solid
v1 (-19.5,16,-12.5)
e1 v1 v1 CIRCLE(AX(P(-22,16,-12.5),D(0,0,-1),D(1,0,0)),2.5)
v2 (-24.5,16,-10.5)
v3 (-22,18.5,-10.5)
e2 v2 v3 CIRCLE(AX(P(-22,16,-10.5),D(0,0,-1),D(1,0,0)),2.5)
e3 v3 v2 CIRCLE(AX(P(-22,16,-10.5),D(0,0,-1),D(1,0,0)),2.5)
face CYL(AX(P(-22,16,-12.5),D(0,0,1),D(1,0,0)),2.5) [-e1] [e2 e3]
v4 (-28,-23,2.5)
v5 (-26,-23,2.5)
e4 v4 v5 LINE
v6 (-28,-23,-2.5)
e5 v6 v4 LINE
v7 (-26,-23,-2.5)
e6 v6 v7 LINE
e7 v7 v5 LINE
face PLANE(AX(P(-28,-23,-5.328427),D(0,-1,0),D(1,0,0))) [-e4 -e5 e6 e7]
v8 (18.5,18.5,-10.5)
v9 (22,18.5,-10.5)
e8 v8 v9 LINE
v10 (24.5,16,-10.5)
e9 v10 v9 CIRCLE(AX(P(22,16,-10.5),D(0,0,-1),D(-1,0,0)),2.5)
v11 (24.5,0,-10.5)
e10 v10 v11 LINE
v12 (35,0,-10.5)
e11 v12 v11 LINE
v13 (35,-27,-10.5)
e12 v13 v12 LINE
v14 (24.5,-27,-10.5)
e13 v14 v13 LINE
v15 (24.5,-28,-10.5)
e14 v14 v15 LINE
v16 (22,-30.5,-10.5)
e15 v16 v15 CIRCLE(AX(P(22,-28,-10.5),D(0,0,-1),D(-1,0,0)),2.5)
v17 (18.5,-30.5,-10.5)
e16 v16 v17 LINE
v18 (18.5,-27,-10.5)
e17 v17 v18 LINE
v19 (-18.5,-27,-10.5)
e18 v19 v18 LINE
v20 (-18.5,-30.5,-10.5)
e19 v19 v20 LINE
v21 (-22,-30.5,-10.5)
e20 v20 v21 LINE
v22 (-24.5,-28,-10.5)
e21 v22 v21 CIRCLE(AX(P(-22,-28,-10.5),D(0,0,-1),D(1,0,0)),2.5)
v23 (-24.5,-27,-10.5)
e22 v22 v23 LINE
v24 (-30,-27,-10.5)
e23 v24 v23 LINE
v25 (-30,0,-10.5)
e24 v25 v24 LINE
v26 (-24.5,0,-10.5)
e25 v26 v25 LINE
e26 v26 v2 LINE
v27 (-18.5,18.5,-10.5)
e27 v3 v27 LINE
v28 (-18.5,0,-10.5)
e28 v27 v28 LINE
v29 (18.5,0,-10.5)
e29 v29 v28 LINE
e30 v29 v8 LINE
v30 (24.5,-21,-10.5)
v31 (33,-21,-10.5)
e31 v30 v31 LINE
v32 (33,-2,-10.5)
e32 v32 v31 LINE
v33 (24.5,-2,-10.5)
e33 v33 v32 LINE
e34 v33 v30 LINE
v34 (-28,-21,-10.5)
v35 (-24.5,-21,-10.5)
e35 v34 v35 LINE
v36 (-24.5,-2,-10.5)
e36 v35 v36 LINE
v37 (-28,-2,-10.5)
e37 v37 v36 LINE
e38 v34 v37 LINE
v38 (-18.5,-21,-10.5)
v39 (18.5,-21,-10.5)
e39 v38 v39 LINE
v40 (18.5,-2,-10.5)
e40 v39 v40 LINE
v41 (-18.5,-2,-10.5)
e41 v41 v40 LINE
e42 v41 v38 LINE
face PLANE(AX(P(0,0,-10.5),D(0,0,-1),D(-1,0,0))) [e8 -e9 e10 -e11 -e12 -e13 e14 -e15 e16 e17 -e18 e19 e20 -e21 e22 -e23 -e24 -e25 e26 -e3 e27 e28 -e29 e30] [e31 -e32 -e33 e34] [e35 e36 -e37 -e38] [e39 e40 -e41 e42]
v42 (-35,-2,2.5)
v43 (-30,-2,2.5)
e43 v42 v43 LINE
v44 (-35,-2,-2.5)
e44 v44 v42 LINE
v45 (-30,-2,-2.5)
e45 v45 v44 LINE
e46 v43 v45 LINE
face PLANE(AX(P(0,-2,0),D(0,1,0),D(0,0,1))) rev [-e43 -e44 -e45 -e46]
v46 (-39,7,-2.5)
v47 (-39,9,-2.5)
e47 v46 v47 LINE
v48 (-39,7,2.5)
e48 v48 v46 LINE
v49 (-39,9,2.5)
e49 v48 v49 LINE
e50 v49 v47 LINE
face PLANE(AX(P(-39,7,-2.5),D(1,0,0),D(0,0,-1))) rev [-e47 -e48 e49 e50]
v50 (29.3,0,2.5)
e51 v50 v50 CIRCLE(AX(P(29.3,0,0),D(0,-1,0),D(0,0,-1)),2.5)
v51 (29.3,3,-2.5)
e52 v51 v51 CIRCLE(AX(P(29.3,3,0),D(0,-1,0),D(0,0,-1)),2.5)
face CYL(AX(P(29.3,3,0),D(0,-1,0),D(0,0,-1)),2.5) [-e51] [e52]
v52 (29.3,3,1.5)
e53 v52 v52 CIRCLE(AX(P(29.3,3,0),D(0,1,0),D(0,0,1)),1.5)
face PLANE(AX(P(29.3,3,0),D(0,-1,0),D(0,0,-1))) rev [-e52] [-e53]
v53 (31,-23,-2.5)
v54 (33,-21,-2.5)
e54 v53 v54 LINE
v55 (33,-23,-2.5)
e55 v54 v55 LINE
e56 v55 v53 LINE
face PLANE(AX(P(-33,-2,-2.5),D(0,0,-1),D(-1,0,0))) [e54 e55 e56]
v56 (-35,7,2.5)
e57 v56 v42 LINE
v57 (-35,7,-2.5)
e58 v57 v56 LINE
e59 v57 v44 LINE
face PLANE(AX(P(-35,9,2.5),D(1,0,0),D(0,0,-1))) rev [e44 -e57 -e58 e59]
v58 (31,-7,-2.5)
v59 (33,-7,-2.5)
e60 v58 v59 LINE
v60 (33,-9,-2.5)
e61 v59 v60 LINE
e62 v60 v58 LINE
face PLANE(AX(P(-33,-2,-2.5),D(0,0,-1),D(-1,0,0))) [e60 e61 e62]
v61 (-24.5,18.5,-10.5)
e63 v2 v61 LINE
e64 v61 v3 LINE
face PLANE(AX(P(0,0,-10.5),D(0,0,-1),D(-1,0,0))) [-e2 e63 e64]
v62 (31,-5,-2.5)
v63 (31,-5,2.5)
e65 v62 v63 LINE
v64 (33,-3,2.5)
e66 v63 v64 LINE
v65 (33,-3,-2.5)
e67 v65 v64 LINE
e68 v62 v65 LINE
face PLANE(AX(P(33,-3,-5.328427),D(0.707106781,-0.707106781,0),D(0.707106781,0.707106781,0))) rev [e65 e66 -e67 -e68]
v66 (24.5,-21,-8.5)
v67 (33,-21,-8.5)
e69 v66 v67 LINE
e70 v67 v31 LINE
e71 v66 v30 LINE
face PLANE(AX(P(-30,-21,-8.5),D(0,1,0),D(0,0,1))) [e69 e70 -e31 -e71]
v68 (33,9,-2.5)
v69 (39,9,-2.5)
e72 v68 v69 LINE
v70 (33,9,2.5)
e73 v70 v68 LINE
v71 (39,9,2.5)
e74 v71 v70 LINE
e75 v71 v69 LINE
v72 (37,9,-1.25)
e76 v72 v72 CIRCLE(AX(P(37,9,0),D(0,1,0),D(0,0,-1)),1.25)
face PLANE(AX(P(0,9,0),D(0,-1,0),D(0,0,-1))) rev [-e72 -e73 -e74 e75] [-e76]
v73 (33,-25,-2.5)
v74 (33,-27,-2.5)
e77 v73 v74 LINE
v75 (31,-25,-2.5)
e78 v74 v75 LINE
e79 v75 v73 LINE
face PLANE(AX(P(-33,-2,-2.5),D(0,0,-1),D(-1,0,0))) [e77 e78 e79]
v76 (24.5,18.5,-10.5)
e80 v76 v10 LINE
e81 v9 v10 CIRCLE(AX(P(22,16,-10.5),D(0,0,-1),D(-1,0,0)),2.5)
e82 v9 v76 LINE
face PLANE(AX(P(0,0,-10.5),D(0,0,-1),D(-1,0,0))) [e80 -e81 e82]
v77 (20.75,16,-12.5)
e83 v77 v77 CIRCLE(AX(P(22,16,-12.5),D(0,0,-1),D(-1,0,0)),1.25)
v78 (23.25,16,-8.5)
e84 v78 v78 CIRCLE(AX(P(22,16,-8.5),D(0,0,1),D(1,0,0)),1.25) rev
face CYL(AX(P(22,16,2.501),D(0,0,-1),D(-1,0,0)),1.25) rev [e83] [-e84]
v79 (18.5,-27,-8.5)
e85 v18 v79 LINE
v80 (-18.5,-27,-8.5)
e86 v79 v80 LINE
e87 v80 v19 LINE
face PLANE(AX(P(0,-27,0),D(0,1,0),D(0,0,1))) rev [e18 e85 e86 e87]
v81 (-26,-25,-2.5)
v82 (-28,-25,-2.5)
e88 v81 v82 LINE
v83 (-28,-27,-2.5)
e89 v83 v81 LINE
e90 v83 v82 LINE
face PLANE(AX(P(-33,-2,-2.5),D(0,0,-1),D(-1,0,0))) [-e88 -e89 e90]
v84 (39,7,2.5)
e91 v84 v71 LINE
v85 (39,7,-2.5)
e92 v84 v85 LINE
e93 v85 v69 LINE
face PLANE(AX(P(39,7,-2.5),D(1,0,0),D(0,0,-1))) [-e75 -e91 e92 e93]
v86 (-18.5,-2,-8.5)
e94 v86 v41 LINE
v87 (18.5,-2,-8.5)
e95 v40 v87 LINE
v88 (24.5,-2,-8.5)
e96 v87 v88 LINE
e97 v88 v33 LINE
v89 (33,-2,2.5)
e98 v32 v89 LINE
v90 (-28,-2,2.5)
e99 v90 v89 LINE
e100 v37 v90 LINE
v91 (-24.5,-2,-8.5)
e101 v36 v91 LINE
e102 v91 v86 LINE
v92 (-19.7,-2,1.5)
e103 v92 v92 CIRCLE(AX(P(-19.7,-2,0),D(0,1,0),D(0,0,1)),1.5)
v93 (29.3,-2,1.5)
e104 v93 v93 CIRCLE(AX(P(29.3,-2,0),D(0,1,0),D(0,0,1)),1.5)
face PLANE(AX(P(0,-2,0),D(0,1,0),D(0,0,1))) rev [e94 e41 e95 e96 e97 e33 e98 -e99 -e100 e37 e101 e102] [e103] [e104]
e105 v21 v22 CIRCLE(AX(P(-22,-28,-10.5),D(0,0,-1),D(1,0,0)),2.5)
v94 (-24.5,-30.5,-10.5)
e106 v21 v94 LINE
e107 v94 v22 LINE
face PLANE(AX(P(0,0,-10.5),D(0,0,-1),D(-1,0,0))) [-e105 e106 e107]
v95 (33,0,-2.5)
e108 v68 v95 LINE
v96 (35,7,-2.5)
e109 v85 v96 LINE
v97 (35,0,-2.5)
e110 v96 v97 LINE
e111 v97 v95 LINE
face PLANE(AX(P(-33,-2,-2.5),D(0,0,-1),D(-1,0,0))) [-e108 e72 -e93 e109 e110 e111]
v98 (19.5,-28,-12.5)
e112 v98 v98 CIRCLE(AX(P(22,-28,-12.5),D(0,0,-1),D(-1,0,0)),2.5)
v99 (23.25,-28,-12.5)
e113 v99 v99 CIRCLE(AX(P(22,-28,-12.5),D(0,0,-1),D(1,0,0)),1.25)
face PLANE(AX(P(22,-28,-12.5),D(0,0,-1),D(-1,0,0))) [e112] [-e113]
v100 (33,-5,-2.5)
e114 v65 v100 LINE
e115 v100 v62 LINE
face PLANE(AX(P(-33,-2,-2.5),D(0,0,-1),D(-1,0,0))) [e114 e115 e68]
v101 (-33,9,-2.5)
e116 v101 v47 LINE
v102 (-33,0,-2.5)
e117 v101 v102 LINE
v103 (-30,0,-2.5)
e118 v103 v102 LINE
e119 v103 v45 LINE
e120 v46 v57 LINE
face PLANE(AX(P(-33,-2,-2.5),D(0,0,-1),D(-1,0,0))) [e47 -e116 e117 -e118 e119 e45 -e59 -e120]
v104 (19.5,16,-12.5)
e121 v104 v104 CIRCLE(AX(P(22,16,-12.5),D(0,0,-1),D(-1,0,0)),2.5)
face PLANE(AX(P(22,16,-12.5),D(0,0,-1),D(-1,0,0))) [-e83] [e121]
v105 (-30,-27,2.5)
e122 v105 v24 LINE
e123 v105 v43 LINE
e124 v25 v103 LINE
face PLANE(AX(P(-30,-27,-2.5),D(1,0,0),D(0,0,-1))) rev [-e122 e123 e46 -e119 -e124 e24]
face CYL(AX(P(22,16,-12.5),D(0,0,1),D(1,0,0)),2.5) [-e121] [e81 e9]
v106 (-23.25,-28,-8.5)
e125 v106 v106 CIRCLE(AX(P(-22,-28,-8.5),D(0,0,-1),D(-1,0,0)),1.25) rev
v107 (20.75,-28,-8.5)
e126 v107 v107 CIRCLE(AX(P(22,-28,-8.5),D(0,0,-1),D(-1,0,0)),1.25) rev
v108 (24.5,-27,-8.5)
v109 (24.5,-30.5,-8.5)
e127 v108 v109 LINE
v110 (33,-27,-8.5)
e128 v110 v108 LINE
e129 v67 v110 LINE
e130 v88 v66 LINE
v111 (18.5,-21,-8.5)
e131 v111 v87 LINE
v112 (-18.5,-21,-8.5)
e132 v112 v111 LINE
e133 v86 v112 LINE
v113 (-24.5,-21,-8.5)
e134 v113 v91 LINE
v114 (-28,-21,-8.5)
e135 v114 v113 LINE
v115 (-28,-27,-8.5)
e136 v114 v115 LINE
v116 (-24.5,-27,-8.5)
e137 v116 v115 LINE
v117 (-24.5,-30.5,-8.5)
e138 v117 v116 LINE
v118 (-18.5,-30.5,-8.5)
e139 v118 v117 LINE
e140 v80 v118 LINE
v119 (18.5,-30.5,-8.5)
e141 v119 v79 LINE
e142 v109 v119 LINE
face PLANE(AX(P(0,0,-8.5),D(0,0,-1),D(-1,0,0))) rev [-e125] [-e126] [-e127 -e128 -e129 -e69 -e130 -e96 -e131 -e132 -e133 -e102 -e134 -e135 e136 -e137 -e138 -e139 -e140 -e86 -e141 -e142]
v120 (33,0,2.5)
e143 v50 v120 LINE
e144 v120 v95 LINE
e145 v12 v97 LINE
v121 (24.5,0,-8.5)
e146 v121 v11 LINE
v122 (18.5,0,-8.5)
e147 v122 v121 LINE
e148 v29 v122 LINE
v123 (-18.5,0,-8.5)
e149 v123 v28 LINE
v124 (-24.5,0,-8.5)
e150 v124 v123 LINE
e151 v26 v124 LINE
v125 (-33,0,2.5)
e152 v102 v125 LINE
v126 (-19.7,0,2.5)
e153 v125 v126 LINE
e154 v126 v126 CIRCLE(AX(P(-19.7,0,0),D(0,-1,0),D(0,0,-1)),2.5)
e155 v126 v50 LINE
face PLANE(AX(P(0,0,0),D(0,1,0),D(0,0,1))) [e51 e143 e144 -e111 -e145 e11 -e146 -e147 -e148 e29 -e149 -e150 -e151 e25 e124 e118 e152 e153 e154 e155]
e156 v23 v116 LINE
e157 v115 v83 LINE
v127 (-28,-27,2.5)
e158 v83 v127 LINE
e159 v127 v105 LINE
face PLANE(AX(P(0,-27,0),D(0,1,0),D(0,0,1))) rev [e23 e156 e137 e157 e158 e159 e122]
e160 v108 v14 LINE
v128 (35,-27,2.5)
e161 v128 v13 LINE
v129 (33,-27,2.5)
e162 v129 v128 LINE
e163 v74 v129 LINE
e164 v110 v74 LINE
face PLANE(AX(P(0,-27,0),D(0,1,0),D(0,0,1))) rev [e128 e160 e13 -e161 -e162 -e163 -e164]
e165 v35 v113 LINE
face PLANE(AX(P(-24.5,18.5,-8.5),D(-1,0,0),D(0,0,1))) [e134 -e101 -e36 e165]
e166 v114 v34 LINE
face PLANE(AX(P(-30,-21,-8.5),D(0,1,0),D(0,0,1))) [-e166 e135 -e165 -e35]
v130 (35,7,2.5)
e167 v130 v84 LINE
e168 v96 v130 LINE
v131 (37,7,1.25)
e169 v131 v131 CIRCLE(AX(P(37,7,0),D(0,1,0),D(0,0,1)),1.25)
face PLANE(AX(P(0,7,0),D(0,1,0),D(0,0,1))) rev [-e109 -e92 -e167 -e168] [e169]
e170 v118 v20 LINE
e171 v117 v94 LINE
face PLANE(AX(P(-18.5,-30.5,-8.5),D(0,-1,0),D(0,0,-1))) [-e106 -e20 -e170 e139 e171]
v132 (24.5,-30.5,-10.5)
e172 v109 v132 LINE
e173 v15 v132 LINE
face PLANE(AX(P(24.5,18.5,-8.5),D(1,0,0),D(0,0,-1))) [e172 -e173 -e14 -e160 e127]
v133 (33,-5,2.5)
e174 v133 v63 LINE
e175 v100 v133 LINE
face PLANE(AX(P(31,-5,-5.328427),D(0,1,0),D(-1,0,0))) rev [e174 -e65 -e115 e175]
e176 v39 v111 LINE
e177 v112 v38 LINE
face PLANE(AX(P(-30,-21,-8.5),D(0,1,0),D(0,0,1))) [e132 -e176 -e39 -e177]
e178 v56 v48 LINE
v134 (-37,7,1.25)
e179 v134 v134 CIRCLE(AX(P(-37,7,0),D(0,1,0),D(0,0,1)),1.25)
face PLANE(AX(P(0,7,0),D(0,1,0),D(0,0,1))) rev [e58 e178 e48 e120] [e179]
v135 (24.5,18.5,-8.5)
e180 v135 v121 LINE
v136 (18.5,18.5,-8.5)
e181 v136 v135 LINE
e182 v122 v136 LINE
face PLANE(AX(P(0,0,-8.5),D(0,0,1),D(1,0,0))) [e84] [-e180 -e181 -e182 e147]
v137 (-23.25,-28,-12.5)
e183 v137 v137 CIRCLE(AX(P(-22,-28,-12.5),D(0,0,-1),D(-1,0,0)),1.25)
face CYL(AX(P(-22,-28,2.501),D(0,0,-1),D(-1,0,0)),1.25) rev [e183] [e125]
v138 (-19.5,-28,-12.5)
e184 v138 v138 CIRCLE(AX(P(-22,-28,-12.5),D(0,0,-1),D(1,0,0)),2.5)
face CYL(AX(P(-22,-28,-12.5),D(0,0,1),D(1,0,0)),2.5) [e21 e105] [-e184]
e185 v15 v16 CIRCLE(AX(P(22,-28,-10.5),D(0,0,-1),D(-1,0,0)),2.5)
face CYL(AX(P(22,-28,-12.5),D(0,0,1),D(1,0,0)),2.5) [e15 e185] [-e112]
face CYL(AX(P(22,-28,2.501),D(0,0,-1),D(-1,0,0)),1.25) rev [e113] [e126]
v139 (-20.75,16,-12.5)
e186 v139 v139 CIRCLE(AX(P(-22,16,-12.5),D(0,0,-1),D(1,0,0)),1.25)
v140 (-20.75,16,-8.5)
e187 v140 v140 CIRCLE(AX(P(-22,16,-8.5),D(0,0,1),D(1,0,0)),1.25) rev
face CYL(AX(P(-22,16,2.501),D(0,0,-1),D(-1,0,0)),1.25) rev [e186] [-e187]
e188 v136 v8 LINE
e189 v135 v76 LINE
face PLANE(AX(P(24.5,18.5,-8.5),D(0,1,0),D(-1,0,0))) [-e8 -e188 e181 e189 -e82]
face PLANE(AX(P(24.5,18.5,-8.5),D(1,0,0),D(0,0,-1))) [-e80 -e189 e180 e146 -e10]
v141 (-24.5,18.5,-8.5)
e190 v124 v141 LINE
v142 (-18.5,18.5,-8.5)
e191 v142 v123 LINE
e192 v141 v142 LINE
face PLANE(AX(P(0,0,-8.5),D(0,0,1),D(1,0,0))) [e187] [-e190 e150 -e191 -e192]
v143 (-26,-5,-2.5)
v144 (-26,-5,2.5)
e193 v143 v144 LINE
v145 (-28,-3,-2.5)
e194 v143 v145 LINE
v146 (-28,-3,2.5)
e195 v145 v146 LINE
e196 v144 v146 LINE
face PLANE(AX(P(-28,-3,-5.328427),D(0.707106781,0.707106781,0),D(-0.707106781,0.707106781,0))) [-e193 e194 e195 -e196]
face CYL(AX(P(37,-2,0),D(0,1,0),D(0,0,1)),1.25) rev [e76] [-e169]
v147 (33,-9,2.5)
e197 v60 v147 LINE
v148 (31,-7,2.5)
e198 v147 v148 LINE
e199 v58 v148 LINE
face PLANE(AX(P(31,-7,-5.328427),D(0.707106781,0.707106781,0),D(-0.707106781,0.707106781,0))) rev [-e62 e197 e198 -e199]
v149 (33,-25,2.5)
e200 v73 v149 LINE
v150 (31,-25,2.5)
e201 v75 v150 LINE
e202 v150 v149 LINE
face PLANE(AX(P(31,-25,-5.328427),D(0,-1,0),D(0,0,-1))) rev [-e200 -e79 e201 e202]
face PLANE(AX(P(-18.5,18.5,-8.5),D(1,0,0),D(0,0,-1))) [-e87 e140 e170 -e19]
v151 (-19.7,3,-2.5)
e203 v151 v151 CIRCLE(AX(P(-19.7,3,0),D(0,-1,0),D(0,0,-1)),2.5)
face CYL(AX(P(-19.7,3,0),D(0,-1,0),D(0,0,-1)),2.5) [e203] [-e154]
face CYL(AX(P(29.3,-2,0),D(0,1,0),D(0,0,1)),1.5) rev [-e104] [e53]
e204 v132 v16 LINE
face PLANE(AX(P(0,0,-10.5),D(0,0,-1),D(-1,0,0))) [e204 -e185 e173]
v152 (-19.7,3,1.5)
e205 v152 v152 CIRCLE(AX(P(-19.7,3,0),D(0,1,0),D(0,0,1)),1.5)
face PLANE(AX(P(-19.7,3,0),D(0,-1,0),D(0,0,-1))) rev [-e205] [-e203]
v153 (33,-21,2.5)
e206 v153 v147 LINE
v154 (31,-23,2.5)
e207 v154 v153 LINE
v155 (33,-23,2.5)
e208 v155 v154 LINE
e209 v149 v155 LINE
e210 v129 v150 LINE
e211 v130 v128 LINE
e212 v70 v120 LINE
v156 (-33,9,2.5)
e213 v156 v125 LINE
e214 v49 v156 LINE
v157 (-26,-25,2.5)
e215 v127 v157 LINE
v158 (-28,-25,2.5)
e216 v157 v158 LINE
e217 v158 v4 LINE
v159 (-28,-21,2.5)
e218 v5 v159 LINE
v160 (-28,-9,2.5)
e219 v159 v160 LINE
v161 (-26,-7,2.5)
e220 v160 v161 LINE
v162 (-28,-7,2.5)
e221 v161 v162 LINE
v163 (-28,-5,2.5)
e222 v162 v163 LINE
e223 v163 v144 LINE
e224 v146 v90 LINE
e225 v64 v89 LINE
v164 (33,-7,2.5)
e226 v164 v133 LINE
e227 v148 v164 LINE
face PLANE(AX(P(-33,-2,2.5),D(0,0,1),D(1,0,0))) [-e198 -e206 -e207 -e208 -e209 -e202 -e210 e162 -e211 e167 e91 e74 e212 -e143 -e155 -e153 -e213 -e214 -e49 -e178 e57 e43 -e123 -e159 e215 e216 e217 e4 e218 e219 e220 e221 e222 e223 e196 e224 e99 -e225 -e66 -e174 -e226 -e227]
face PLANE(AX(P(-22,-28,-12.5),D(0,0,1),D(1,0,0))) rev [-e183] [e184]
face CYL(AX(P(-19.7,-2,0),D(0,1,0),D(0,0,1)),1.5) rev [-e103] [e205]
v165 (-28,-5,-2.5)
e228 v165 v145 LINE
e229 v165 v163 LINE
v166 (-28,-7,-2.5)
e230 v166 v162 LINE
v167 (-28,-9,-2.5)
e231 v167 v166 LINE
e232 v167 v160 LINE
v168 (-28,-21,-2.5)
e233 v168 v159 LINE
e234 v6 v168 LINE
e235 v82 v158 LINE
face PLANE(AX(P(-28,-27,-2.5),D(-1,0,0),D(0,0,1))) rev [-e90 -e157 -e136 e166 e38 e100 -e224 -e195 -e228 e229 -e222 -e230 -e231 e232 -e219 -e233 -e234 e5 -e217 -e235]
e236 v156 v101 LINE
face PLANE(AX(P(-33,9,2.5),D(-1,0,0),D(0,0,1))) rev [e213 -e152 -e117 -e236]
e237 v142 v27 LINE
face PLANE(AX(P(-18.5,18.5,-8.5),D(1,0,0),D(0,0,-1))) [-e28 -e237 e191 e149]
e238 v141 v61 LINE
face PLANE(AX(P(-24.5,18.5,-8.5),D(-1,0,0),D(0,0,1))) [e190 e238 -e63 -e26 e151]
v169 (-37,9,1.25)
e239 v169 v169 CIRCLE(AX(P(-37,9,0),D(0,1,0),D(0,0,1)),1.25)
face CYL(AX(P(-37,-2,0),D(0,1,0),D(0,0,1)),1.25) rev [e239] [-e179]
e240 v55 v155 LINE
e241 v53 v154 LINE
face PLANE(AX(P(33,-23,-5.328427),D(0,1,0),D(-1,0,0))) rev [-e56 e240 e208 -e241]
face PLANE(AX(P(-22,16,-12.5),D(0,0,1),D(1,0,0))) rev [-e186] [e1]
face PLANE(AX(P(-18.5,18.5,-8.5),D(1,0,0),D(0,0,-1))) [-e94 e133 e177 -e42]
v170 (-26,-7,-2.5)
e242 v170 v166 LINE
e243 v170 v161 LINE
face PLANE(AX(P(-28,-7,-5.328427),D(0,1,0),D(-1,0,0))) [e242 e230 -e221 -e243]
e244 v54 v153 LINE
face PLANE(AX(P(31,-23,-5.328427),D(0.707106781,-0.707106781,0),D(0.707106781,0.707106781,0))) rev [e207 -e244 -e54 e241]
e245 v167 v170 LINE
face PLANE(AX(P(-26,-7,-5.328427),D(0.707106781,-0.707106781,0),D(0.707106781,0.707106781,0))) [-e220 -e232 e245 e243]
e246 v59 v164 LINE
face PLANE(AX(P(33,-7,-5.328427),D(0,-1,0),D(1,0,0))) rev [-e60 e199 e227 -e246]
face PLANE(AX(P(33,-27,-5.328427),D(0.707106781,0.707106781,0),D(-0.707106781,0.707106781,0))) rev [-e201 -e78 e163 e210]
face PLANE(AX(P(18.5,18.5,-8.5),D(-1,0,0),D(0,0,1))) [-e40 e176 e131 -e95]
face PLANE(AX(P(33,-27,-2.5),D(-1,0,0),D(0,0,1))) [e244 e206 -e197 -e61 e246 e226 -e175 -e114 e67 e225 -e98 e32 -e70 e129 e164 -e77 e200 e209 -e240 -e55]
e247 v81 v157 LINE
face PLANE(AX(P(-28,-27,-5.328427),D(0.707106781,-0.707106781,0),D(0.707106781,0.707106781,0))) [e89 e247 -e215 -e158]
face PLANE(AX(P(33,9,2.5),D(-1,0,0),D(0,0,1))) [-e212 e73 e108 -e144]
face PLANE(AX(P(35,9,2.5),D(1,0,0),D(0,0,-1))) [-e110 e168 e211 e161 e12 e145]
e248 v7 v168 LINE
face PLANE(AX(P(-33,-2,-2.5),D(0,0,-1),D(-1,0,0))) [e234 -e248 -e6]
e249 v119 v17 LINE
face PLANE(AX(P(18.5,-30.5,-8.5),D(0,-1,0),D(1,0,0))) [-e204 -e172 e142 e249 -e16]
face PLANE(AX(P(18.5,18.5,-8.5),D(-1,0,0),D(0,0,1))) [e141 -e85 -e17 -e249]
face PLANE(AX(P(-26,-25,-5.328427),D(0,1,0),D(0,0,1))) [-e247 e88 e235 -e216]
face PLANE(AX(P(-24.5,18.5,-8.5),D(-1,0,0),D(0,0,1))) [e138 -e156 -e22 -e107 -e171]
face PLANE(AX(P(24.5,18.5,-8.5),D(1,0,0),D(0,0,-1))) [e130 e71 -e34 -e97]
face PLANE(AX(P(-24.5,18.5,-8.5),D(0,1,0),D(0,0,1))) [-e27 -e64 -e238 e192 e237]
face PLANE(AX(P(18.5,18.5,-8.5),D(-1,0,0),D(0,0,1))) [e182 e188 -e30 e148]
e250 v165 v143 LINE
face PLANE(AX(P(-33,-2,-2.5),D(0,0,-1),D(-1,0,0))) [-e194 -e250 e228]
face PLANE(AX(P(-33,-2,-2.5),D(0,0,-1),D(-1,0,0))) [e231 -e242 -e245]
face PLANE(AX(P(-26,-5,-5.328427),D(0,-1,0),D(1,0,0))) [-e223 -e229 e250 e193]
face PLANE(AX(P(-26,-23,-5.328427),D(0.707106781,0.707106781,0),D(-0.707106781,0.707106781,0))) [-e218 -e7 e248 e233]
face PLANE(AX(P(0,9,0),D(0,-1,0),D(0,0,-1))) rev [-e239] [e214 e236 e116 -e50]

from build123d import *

# Parameters (mm, degrees)
SKETCH1_W           = 66
SKETCH1_H           = 5
BASE_FLANGE1_DEPTH  = 2
SKETCH2_R           = 2.5
BOSS_EXTRUDE1_DEPTH = 3
SKETCH3_W           = 2
SKETCH3_H           = 5
BOSS_EXTRUDE2_DEPTH = 11
SKETCH4_W           = 6
SKETCH4_H           = 5
BOSS_EXTRUDE3_DEPTH = 2
SKETCH5_R           = 1.5
CUT_EXTRUDE1_DEPTH  = 40.537956447
SKETCH6_R           = 1.25
CUT_EXTRUDE2_DEPTH  = 41.598645298
SKETCH7_W           = 2
SKETCH7_H           = 5
BOSS_EXTRUDE4_DEPTH = 25
BOSS_EXTRUDE5_DEPTH = 5
BOSS_EXTRUDE6_DEPTH = 8
SKETCH13_W          = 65
SKETCH13_H          = 6
BOSS_EXTRUDE8_DEPTH = 2
SKETCH12_W          = 6
SKETCH12_H          = 49
BOSS_EXTRUDE7_DEPTH = 2
SKETCH14_R          = 2.5
BOSS_EXTRUDE9_DEPTH = 2
CUT_EXTRUDE3_REACH  = 53.732
SKETCH15_R          = 1.25


# Sheet-metal steps are written as plain solids
with BuildPart() as part:
    # Sketch1 → Base-Flange1 (new body)
    with BuildSketch(Plane(origin=(0, 0, 0), x_dir=(1, 0, 0), z_dir=(0, 1, 0))):
        Rectangle(SKETCH1_W, SKETCH1_H)
    extrude(amount=-BASE_FLANGE1_DEPTH)

    # Sketch2 → Boss-Extrude1 (add)
    with BuildSketch(Plane(origin=(0, 0, 0), x_dir=(-1, 0, 0), z_dir=(0, -1, 0))):
        with Locations(Location((19.7, 0, 0), (0, 0, 90))):
            Circle(SKETCH2_R)
        with Locations(Location((-29.3, 0, 0), (0, 0, 90))):
            Circle(SKETCH2_R)
    extrude(amount=-BOSS_EXTRUDE1_DEPTH)

    # Sketch3 → Boss-Extrude2 (add)
    with BuildSketch(Plane(origin=(0, -2, 0), x_dir=(-1, 0, 0), z_dir=(0, -1, 0))):
        with Locations((-34, 0)):
            Rectangle(SKETCH3_W, SKETCH3_H)
    boss_extrude2 = extrude(amount=-BOSS_EXTRUDE2_DEPTH)

    # Sketch4 → Boss-Extrude3 (add)
    with BuildSketch(Plane(origin=(0, 9, 0), x_dir=(1, 0, 0), z_dir=(0, 1, 0))):
        with Locations((36, 0)):
            Rectangle(SKETCH4_W, SKETCH4_H)
    boss_extrude3 = extrude(amount=-BOSS_EXTRUDE3_DEPTH)

    # Mirror1: Boss-Extrude2, Boss-Extrude3 across plane
    add(boss_extrude2.mirror(Plane(origin=(0, 0, 0), x_dir=(0, 0, 1), z_dir=(1, 0, 0))))
    add(boss_extrude3.mirror(Plane(origin=(0, 0, 0), x_dir=(0, 0, 1), z_dir=(1, 0, 0))))

    # Sketch5 → Cut-Extrude1 (cut, through all)
    with BuildSketch(Plane(origin=(0, 3, 0), x_dir=(1, 0, 0), z_dir=(0, 1, 0))):
        with Locations(Location((-19.7, 0, 0), (0, 0, 270))):
            Circle(SKETCH5_R)
        with Locations(Location((29.3, 0, 0), (0, 0, 270))):
            Circle(SKETCH5_R)
    extrude(amount=-CUT_EXTRUDE1_DEPTH, mode=Mode.SUBTRACT)

    # Sketch6 → Cut-Extrude2 (cut, through all)
    with BuildSketch(Plane(origin=(0, 9, 0), x_dir=(1, 0, 0), z_dir=(0, 1, 0))):
        with Locations(Location((-37, 0, 0), (0, 0, 270))):
            Circle(SKETCH6_R)
        with Locations(Location((37, 0, 0), (0, 0, 270))):
            Circle(SKETCH6_R)
    extrude(amount=-CUT_EXTRUDE2_DEPTH, mode=Mode.SUBTRACT)

    # Sketch7 → Boss-Extrude4 (add)
    with BuildSketch(Plane(origin=(0, -2, 0), x_dir=(-1, 0, 0), z_dir=(0, -1, 0))):
        with Locations((29, 0)):
            Rectangle(SKETCH7_W, SKETCH7_H)
    boss_extrude4 = extrude(amount=BOSS_EXTRUDE4_DEPTH)

    # Sketch8 → Boss-Extrude5 (add)
    with BuildSketch(Plane.XY.offset(2.5)):
        Polygon((-28, -3), (-26, -5), (-28, -5), align=None)
        Polygon((-28, -7), (-26, -7), (-28, -9), align=None)
        Polygon((-28, -21), (-28, -23), (-26, -23), align=None)
        Polygon((-28, -25), (-28, -27), (-26, -25), align=None)
    boss_extrude5 = extrude(amount=-BOSS_EXTRUDE5_DEPTH)

    # Mirror2: Boss-Extrude4, Boss-Extrude5 across plane
    add(boss_extrude4.mirror(Plane(origin=(2.5, 0, 0), x_dir=(0, 0, 1), z_dir=(1, 0, 0))))
    add(boss_extrude5.mirror(Plane(origin=(2.5, 0, 0), x_dir=(0, 0, 1), z_dir=(1, 0, 0))))

    # Sketch11 → Boss-Extrude6 (add)
    with BuildSketch(Plane.XY.offset(-2.5)):
        Polygon((-30, -27), (-30, 0), (35, 0), (35, -27), (33, -27), (33, -2), (-28, -2), (-28, -27), align=None)
    extrude(amount=-BOSS_EXTRUDE6_DEPTH)

    # Sketch13 → Boss-Extrude8 (add)
    with BuildSketch(Plane(origin=(0, 0, -10.5), x_dir=(-1, 0, 0), z_dir=(0, 0, -1))):
        with Locations((-2.5, -24)):
            Rectangle(SKETCH13_W, SKETCH13_H)
    extrude(amount=-BOSS_EXTRUDE8_DEPTH)

    # Sketch12 → Boss-Extrude7 (add)
    with BuildSketch(Plane(origin=(0, 0, -10.5), x_dir=(-1, 0, 0), z_dir=(0, 0, -1))):
        with Locations((-21.5, -6)):
            Rectangle(SKETCH12_W, SKETCH12_H)
        with Locations((21.5, -6)):
            Rectangle(SKETCH12_W, SKETCH12_H)
    extrude(amount=-BOSS_EXTRUDE7_DEPTH)

    # Sketch14 → Boss-Extrude9 (add)
    with BuildSketch(Plane(origin=(0, 0, -10.5), x_dir=(-1, 0, 0), z_dir=(0, 0, -1))):
        with Locations(Location((-22, 16, 0), (0, 0, 180))):
            Circle(SKETCH14_R)
        with Locations(Location((22, 16, 0), (0, 0, 180))):
            Circle(SKETCH14_R)
        with Locations(Location((-22, -28, 0), (0, 0, 180))):
            Circle(SKETCH14_R)
        with Locations(Location((22, -28, 0), (0, 0, 180))):
            Circle(SKETCH14_R)
    extrude(amount=BOSS_EXTRUDE9_DEPTH)

    # Sketch15 → Cut-Extrude3 (cut, up to next)
    with BuildSketch(Plane(origin=(0, 0, -12.5), x_dir=(-1, 0, 0), z_dir=(0, 0, -1)), mode=Mode.PRIVATE) as cut_extrude3_sk1:
        with Locations((-22, 16)):
            Circle(SKETCH15_R)
    cut_extrude3_tool1 = extrude(cut_extrude3_sk1.sketch, amount=-CUT_EXTRUDE3_REACH, mode=Mode.PRIVATE) & part.part
    # Sketch15 → Cut-Extrude3 (cut, up to next)
    with BuildSketch(Plane(origin=(0, 0, -12.5), x_dir=(-1, 0, 0), z_dir=(0, 0, -1)), mode=Mode.PRIVATE) as cut_extrude3_sk2:
        with Locations(Location((22, 16, 0), (0, 0, 180))):
            Circle(SKETCH15_R)
    cut_extrude3_tool2 = extrude(cut_extrude3_sk2.sketch, amount=-CUT_EXTRUDE3_REACH, mode=Mode.PRIVATE) & part.part
    # Sketch15 → Cut-Extrude3 (cut, up to next)
    with BuildSketch(Plane(origin=(0, 0, -12.5), x_dir=(-1, 0, 0), z_dir=(0, 0, -1)), mode=Mode.PRIVATE) as cut_extrude3_sk3:
        with Locations((22, -28)):
            Circle(SKETCH15_R)
    cut_extrude3_tool3 = extrude(cut_extrude3_sk3.sketch, amount=-CUT_EXTRUDE3_REACH, mode=Mode.PRIVATE) & part.part
    # Sketch15 → Cut-Extrude3 (cut, up to next)
    with BuildSketch(Plane(origin=(0, 0, -12.5), x_dir=(-1, 0, 0), z_dir=(0, 0, -1)), mode=Mode.PRIVATE) as cut_extrude3_sk4:
        with Locations((-22, -28)):
            Circle(SKETCH15_R)
    cut_extrude3_tool4 = extrude(cut_extrude3_sk4.sketch, amount=-CUT_EXTRUDE3_REACH, mode=Mode.PRIVATE) & part.part
    add(cut_extrude3_tool1.solids().sort_by_distance((22, 16, -12.5))[0], mode=Mode.SUBTRACT)
    add(cut_extrude3_tool2.solids().sort_by_distance((-22, 16, -12.5))[0], mode=Mode.SUBTRACT)
    add(cut_extrude3_tool3.solids().sort_by_distance((-22, -28, -12.5))[0], mode=Mode.SUBTRACT)
    add(cut_extrude3_tool4.solids().sort_by_distance((22, -28, -12.5))[0], mode=Mode.SUBTRACT)


solid = part.part
